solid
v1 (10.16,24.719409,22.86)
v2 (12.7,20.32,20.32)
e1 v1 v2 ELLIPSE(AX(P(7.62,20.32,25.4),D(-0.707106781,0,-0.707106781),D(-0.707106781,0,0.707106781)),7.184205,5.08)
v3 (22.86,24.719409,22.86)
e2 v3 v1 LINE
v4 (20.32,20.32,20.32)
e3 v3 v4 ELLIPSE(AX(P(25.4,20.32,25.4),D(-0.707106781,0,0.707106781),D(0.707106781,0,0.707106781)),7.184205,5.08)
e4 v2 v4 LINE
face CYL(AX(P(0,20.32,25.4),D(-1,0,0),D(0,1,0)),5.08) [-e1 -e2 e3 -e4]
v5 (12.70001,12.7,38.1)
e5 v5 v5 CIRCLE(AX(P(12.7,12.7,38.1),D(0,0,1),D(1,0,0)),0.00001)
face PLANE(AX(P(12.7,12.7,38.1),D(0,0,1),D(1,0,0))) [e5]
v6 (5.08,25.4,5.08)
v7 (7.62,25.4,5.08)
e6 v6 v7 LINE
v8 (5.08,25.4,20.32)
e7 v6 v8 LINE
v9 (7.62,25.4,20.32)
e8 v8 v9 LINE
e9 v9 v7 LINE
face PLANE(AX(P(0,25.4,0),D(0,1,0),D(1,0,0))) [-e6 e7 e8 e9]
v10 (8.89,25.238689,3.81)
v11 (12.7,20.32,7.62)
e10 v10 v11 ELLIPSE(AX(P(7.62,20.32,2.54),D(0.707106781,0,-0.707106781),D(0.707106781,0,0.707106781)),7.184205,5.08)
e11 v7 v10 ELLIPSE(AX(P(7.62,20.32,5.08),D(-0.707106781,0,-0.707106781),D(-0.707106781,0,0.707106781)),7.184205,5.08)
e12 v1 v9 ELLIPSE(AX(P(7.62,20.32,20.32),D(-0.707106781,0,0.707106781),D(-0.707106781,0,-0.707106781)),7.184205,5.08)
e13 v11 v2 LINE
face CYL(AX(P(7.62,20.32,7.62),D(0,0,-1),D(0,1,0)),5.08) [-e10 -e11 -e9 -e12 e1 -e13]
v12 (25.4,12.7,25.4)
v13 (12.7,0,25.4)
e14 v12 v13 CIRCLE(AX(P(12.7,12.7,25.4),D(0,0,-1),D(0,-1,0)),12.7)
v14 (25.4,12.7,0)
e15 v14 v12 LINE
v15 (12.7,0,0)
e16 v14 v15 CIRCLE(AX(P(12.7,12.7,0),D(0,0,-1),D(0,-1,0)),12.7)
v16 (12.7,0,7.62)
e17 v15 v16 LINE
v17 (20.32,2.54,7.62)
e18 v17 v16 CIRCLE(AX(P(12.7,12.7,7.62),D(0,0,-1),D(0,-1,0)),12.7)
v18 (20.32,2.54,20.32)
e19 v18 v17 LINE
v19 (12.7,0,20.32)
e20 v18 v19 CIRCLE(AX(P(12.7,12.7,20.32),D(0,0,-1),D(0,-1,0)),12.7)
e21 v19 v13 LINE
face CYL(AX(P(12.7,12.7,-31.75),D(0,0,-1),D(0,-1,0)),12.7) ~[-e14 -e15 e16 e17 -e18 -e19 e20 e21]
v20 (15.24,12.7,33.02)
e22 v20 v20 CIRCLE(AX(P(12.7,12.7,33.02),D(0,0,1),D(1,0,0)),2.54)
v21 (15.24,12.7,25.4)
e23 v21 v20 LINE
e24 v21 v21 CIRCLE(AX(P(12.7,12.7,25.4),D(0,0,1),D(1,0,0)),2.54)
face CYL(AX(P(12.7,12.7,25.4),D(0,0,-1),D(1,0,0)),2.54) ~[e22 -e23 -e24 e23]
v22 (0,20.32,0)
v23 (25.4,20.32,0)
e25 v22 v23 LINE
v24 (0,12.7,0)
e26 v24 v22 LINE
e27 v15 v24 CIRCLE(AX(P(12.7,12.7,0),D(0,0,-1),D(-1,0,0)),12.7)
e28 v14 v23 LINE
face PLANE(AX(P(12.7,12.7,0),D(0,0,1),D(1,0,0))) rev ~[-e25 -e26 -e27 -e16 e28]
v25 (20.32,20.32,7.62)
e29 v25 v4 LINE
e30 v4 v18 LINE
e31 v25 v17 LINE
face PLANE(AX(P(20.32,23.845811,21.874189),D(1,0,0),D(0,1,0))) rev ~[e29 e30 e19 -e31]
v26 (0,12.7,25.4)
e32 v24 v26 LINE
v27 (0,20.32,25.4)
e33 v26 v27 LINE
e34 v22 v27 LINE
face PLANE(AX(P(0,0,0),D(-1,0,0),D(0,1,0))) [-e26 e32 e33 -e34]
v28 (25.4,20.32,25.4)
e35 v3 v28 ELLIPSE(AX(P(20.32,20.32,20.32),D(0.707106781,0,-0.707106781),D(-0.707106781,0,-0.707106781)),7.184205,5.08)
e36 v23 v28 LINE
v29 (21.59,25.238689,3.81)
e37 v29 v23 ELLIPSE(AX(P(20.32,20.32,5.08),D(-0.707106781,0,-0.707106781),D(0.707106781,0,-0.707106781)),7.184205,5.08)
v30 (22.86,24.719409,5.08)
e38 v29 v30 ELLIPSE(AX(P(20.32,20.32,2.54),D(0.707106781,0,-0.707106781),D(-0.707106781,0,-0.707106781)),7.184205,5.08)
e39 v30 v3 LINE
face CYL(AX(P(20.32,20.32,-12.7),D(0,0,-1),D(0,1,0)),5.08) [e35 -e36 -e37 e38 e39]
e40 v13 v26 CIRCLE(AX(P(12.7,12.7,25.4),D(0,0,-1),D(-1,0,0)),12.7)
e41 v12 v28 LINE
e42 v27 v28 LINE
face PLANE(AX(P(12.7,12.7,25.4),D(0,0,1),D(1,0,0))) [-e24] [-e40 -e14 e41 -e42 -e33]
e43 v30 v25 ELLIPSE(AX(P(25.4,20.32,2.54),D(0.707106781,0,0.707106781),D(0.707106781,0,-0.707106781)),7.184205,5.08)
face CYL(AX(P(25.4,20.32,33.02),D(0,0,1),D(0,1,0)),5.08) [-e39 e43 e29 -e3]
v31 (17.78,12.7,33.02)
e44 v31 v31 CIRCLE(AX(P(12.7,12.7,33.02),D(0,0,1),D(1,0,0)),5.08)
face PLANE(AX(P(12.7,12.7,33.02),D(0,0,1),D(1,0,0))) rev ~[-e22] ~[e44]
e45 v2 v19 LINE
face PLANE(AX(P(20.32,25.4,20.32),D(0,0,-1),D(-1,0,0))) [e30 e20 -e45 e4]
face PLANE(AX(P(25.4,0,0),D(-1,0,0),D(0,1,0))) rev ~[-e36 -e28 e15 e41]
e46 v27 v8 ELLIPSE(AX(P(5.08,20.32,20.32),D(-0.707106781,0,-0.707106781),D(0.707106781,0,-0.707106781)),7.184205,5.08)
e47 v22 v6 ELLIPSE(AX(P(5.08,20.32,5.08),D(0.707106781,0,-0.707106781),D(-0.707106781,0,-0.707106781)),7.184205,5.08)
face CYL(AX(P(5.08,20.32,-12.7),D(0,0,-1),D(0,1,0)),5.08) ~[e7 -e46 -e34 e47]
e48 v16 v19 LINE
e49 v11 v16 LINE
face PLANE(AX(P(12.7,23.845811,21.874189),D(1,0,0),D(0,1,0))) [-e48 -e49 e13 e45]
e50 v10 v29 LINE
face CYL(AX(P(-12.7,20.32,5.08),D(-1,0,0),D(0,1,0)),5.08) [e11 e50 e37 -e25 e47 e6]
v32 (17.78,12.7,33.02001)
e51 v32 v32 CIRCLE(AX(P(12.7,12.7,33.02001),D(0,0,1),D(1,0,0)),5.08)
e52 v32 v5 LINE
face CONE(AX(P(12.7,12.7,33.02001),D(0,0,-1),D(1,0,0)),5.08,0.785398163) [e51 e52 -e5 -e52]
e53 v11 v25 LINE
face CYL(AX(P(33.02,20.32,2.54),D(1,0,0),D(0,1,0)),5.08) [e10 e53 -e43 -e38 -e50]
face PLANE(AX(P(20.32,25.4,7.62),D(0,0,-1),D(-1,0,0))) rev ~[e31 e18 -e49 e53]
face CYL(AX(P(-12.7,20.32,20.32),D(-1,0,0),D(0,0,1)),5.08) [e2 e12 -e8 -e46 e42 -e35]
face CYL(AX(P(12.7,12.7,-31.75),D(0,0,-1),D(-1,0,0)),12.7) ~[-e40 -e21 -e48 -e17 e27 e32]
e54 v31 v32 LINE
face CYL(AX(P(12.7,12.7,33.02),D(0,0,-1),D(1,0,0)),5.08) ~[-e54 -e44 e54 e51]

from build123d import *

# Parameters (mm, degrees)
F0_W          = 25.4
F0_H          = 25.4
F1_DEPTH      = 25.4
F2_T1_DEPTH   = 88.9
F3_R          = 2.54
F4_DEPTH      = 7.62
F5_R          = 5.08
F6_DEPTH      = 5.08
F7_SIZE       = 5.07999
F8_W          = 7.62
F8_H          = 12.7
F9_DEPTH      = 25.4
F10_T1_DEPTH  = 50.8
F10_T3_DEPTH  = 50.8
F10_T5_DEPTH  = 7.62
F10_T7_DEPTH  = 12.7
F10_T13_DEPTH = 20.32
F10_T18_DEPTH = 25.4
F10_T26_DEPTH = 20.32
F10_T30_DEPTH = 25.4
F10_T38_DEPTH = 25.4
F10_T43_DEPTH = 20.32
F10_T51_DEPTH = 20.32
F10_T55_DEPTH = 25.4


# Not quite as in the source:
# - a fillet or chamfer that OpenCascade refuses, or shapes differently, is made with other operations: its cross-section is extruded or revolved along the edge and cut away or added
# - a fillet or chamfer is up to 0.001 mm smaller than in the source, because OpenCascade refuses the exact size


with BuildPart() as f1:
    # F0 (on Top) → F1 (new body)
    with BuildSketch(Plane.XY):
        with Locations((12.7, 12.7)):
            Rectangle(F0_W, F0_H)
    extrude(amount=F1_DEPTH)

    # F2: fillet of radius 12.7 on 2 edges, made by hand

    # F2_s2 → F2_t1 (cut)
    with BuildSketch(Plane.XY.offset(-31.75)):
        with BuildLine():
            ThreePointArc((0, 12.7), (3.7197438789, 3.7197438789), (12.7, 0))
            Line((12.7, 0), (0, 0))
            Line((0, 0), (0, 12.7))
        make_face()
        with BuildLine():
            ThreePointArc((12.7, 0), (21.6802561211, 3.7197438789), (25.4, 12.7))
            Line((25.4, 12.7), (25.4, 0))
            Line((25.4, 0), (12.7, 0))
        make_face()
    extrude(amount=F2_T1_DEPTH, mode=Mode.SUBTRACT)

    # F3 (on face) → F4 (join)
    with BuildSketch(Plane.XY.offset(25.4)):
        with Locations((12.7, 12.7)):
            Circle(F3_R)
    extrude(amount=F4_DEPTH)

    # F5 (on face) → F6 (join)
    with BuildSketch(Plane.XY.offset(33.02)):
        with Locations((12.7, 12.7)):
            Circle(F5_R)
    extrude(amount=F6_DEPTH)

    # F7 (size 5.08 in the source; OpenCascade refuses exactly that, so slightly less here)
    f7_edges = [f1.edges().sort_by_distance(p)[0] for p in [
        (7.62, 12.7, 38.1),
    ]]
    chamfer(f7_edges, length=F7_SIZE)

    # F8 (on face) → F9 (cut)
    with BuildSketch(Plane(origin=(0, 25.4, 0), x_dir=(-1, 0, 0), z_dir=(0, 1, 0))):
        with Locations((-16.51, 13.97)):
            Rectangle(F8_W, F8_H)
    extrude(amount=-F9_DEPTH, mode=Mode.SUBTRACT)

    # F10: fillet of radius 5.08 on 8 edges, made by hand

    # F10_s2 → F10_t1 (cut)
    with BuildSketch(Plane.XY.offset(-12.7)):
        with BuildLine():
            ThreePointArc((20.32, 25.4), (23.9121024484, 23.9121024484), (25.4, 20.32))
            Line((25.4, 20.32), (25.4, 25.4))
            Line((25.4, 25.4), (20.32, 25.4))
        make_face()
        with BuildLine():
            ThreePointArc((5.08, 25.4), (1.4878975516, 23.9121024484), (0, 20.32))
            Line((0, 20.32), (0, 25.4))
            Line((0, 25.4), (5.08, 25.4))
        make_face()
    extrude(amount=F10_T1_DEPTH, mode=Mode.SUBTRACT)

    # F10_s4 → F10_t3 (cut)
    with BuildSketch(Plane.YZ.offset(-12.7)):
        with BuildLine():
            ThreePointArc((25.4, 5.08), (23.9121024484, 1.4878975516), (20.32, 0))
            Line((20.32, 0), (25.4, 0))
            Line((25.4, 0), (25.4, 5.08))
        make_face()
        with BuildLine():
            ThreePointArc((20.32, 25.4), (23.9121024484, 23.9121024484), (25.4, 20.32))
            Line((25.4, 20.32), (25.4, 25.4))
            Line((25.4, 25.4), (20.32, 25.4))
        make_face()
    extrude(amount=F10_T3_DEPTH, mode=Mode.SUBTRACT)

    # F10_s6 → F10_t5 (cut)
    with BuildSketch(Plane.YZ.offset(12.7)):
        with BuildLine():
            ThreePointArc((25.4, 2.54), (23.9121024484, 6.1321024484), (20.32, 7.62))
            Line((20.32, 7.62), (25.4, 7.62))
            Line((25.4, 7.62), (25.4, 2.54))
        make_face()
        with BuildLine():
            ThreePointArc((25.4, 25.4), (23.9121024484, 21.8078975516), (20.32, 20.32))
            Line((20.32, 20.32), (25.4, 20.32))
            Line((25.4, 20.32), (25.4, 25.4))
        make_face()
    extrude(amount=F10_T5_DEPTH, mode=Mode.SUBTRACT)

    # F10_s8 → F10_t7 (cut)
    with BuildSketch(Plane.XY.offset(7.62)):
        with BuildLine():
            ThreePointArc((25.4, 25.4), (21.8078975516, 23.9121024484), (20.32, 20.32))
            Line((20.32, 20.32), (20.32, 25.4))
            Line((20.32, 25.4), (25.4, 25.4))
        make_face()
        with BuildLine():
            ThreePointArc((7.62, 25.4), (11.2121024484, 23.9121024484), (12.7, 20.32))
            Line((12.7, 20.32), (12.7, 25.4))
            Line((12.7, 25.4), (7.62, 25.4))
        make_face()
    extrude(amount=F10_T7_DEPTH, mode=Mode.SUBTRACT)


with BuildPart() as f10_tool11:
    # F10_s12 → F10_t13 (new body)
    with BuildSketch(Plane.YZ.offset(33.02)):
        with BuildLine():
            ThreePointArc((25.4, 2.54), (23.9121024484, 6.1321024484), (20.32, 7.62))
            Line((20.32, 7.62), (25.4, 7.62))
            Line((25.4, 7.62), (25.4, 2.54))
        make_face()
    extrude(amount=-F10_T13_DEPTH)

    split(bisect_by=Plane.YZ.offset(25.4), keep=Keep.BOTTOM)

    split(bisect_by=Plane.YZ.offset(20.32), keep=Keep.TOP)


with BuildPart() as f10_tool16:
    # F10_s17 → F10_t18 (new body)
    with BuildSketch(Plane.XY.offset(20.32)):
        with BuildLine():
            ThreePointArc((25.4, 25.4), (21.8078975516, 23.9121024484), (20.32, 20.32))
            Line((20.32, 20.32), (20.32, 25.4))
            Line((20.32, 25.4), (25.4, 25.4))
        make_face()
    extrude(amount=-F10_T18_DEPTH)

    split(bisect_by=Plane.XY, keep=Keep.TOP)

    split(bisect_by=Plane.XY.offset(7.62), keep=Keep.BOTTOM)


with BuildPart() as f10_tool11_1:
    add(f10_tool11.part)

    # F10_t21: intersect F10_tool16
    add(f10_tool16.part, mode=Mode.INTERSECT)


with BuildPart() as f1_1:
    add(f1.part)

    # F10_t9: cut F10_tool11
    add(f10_tool11_1.part, mode=Mode.SUBTRACT)


with BuildPart() as f10_tool24:
    # F10_s25 → F10_t26 (new body)
    with BuildSketch(Plane.YZ.offset(20.32)):
        with BuildLine():
            ThreePointArc((25.4, 2.54), (23.9121024484, 6.1321024484), (20.32, 7.62))
            Line((20.32, 7.62), (25.4, 7.62))
            Line((25.4, 7.62), (25.4, 2.54))
        make_face()
    extrude(amount=-F10_T26_DEPTH)

    split(bisect_by=Plane.YZ.offset(12.7), keep=Keep.BOTTOM)


with BuildPart() as f10_tool28:
    # F10_s29 → F10_t30 (new body)
    with BuildSketch(Plane.XY.offset(-5.08)):
        with BuildLine():
            ThreePointArc((7.62, 25.4), (11.2121024484, 23.9121024484), (12.7, 20.32))
            Line((12.7, 20.32), (12.7, 25.4))
            Line((12.7, 25.4), (7.62, 25.4))
        make_face()
    extrude(amount=F10_T30_DEPTH)

    split(bisect_by=Plane.XY, keep=Keep.TOP)

    split(bisect_by=Plane.XY.offset(7.62), keep=Keep.BOTTOM)


with BuildPart() as f10_tool24_1:
    add(f10_tool24.part)

    # F10_t33: intersect F10_tool28
    add(f10_tool28.part, mode=Mode.INTERSECT)


with BuildPart() as f1_2:
    add(f1_1.part)

    # F10_t22: cut F10_tool24
    add(f10_tool24_1.part, mode=Mode.SUBTRACT)


with BuildPart() as f10_tool36:
    # F10_s37 → F10_t38 (new body)
    with BuildSketch(Plane.XY.offset(33.02)):
        with BuildLine():
            ThreePointArc((25.4, 25.4), (21.8078975516, 23.9121024484), (20.32, 20.32))
            Line((20.32, 20.32), (20.32, 25.4))
            Line((20.32, 25.4), (25.4, 25.4))
        make_face()
    extrude(amount=-F10_T38_DEPTH)

    split(bisect_by=Plane.XY.offset(25.4), keep=Keep.BOTTOM)

    split(bisect_by=Plane.XY.offset(20.32), keep=Keep.TOP)


with BuildPart() as f10_tool41:
    # F10_s42 → F10_t43 (new body)
    with BuildSketch(Plane.YZ.offset(12.7)):
        with BuildLine():
            ThreePointArc((25.4, 25.4), (23.9121024484, 21.8078975516), (20.32, 20.32))
            Line((20.32, 20.32), (25.4, 20.32))
            Line((25.4, 20.32), (25.4, 25.4))
        make_face()
    extrude(amount=F10_T43_DEPTH)

    split(bisect_by=Plane.YZ.offset(25.4), keep=Keep.BOTTOM)

    split(bisect_by=Plane.YZ.offset(20.32), keep=Keep.TOP)


with BuildPart() as f10_tool36_1:
    add(f10_tool36.part)

    # F10_t46: intersect F10_tool41
    add(f10_tool41.part, mode=Mode.INTERSECT)


with BuildPart() as f1_3:
    add(f1_2.part)

    # F10_t34: cut F10_tool36
    add(f10_tool36_1.part, mode=Mode.SUBTRACT)


with BuildPart() as f10_tool49:
    # F10_s50 → F10_t51 (new body)
    with BuildSketch(Plane.YZ):
        with BuildLine():
            ThreePointArc((25.4, 25.4), (23.9121024484, 21.8078975516), (20.32, 20.32))
            Line((20.32, 20.32), (25.4, 20.32))
            Line((25.4, 20.32), (25.4, 25.4))
        make_face()
    extrude(amount=F10_T51_DEPTH)

    split(bisect_by=Plane.YZ.offset(12.7), keep=Keep.BOTTOM)


with BuildPart() as f10_tool53:
    # F10_s54 → F10_t55 (new body)
    with BuildSketch(Plane.XY.offset(7.62)):
        with BuildLine():
            ThreePointArc((7.62, 25.4), (11.2121024484, 23.9121024484), (12.7, 20.32))
            Line((12.7, 20.32), (12.7, 25.4))
            Line((12.7, 25.4), (7.62, 25.4))
        make_face()
    extrude(amount=F10_T55_DEPTH)

    split(bisect_by=Plane.XY.offset(25.4), keep=Keep.BOTTOM)

    split(bisect_by=Plane.XY.offset(20.32), keep=Keep.TOP)


with BuildPart() as f10_tool49_1:
    add(f10_tool49.part)

    # F10_t58: intersect F10_tool53
    add(f10_tool53.part, mode=Mode.INTERSECT)


with BuildPart() as f1_4:
    add(f1_3.part)

    # F10_t47: cut F10_tool49
    add(f10_tool49_1.part, mode=Mode.SUBTRACT)


solid = f1_4.part
